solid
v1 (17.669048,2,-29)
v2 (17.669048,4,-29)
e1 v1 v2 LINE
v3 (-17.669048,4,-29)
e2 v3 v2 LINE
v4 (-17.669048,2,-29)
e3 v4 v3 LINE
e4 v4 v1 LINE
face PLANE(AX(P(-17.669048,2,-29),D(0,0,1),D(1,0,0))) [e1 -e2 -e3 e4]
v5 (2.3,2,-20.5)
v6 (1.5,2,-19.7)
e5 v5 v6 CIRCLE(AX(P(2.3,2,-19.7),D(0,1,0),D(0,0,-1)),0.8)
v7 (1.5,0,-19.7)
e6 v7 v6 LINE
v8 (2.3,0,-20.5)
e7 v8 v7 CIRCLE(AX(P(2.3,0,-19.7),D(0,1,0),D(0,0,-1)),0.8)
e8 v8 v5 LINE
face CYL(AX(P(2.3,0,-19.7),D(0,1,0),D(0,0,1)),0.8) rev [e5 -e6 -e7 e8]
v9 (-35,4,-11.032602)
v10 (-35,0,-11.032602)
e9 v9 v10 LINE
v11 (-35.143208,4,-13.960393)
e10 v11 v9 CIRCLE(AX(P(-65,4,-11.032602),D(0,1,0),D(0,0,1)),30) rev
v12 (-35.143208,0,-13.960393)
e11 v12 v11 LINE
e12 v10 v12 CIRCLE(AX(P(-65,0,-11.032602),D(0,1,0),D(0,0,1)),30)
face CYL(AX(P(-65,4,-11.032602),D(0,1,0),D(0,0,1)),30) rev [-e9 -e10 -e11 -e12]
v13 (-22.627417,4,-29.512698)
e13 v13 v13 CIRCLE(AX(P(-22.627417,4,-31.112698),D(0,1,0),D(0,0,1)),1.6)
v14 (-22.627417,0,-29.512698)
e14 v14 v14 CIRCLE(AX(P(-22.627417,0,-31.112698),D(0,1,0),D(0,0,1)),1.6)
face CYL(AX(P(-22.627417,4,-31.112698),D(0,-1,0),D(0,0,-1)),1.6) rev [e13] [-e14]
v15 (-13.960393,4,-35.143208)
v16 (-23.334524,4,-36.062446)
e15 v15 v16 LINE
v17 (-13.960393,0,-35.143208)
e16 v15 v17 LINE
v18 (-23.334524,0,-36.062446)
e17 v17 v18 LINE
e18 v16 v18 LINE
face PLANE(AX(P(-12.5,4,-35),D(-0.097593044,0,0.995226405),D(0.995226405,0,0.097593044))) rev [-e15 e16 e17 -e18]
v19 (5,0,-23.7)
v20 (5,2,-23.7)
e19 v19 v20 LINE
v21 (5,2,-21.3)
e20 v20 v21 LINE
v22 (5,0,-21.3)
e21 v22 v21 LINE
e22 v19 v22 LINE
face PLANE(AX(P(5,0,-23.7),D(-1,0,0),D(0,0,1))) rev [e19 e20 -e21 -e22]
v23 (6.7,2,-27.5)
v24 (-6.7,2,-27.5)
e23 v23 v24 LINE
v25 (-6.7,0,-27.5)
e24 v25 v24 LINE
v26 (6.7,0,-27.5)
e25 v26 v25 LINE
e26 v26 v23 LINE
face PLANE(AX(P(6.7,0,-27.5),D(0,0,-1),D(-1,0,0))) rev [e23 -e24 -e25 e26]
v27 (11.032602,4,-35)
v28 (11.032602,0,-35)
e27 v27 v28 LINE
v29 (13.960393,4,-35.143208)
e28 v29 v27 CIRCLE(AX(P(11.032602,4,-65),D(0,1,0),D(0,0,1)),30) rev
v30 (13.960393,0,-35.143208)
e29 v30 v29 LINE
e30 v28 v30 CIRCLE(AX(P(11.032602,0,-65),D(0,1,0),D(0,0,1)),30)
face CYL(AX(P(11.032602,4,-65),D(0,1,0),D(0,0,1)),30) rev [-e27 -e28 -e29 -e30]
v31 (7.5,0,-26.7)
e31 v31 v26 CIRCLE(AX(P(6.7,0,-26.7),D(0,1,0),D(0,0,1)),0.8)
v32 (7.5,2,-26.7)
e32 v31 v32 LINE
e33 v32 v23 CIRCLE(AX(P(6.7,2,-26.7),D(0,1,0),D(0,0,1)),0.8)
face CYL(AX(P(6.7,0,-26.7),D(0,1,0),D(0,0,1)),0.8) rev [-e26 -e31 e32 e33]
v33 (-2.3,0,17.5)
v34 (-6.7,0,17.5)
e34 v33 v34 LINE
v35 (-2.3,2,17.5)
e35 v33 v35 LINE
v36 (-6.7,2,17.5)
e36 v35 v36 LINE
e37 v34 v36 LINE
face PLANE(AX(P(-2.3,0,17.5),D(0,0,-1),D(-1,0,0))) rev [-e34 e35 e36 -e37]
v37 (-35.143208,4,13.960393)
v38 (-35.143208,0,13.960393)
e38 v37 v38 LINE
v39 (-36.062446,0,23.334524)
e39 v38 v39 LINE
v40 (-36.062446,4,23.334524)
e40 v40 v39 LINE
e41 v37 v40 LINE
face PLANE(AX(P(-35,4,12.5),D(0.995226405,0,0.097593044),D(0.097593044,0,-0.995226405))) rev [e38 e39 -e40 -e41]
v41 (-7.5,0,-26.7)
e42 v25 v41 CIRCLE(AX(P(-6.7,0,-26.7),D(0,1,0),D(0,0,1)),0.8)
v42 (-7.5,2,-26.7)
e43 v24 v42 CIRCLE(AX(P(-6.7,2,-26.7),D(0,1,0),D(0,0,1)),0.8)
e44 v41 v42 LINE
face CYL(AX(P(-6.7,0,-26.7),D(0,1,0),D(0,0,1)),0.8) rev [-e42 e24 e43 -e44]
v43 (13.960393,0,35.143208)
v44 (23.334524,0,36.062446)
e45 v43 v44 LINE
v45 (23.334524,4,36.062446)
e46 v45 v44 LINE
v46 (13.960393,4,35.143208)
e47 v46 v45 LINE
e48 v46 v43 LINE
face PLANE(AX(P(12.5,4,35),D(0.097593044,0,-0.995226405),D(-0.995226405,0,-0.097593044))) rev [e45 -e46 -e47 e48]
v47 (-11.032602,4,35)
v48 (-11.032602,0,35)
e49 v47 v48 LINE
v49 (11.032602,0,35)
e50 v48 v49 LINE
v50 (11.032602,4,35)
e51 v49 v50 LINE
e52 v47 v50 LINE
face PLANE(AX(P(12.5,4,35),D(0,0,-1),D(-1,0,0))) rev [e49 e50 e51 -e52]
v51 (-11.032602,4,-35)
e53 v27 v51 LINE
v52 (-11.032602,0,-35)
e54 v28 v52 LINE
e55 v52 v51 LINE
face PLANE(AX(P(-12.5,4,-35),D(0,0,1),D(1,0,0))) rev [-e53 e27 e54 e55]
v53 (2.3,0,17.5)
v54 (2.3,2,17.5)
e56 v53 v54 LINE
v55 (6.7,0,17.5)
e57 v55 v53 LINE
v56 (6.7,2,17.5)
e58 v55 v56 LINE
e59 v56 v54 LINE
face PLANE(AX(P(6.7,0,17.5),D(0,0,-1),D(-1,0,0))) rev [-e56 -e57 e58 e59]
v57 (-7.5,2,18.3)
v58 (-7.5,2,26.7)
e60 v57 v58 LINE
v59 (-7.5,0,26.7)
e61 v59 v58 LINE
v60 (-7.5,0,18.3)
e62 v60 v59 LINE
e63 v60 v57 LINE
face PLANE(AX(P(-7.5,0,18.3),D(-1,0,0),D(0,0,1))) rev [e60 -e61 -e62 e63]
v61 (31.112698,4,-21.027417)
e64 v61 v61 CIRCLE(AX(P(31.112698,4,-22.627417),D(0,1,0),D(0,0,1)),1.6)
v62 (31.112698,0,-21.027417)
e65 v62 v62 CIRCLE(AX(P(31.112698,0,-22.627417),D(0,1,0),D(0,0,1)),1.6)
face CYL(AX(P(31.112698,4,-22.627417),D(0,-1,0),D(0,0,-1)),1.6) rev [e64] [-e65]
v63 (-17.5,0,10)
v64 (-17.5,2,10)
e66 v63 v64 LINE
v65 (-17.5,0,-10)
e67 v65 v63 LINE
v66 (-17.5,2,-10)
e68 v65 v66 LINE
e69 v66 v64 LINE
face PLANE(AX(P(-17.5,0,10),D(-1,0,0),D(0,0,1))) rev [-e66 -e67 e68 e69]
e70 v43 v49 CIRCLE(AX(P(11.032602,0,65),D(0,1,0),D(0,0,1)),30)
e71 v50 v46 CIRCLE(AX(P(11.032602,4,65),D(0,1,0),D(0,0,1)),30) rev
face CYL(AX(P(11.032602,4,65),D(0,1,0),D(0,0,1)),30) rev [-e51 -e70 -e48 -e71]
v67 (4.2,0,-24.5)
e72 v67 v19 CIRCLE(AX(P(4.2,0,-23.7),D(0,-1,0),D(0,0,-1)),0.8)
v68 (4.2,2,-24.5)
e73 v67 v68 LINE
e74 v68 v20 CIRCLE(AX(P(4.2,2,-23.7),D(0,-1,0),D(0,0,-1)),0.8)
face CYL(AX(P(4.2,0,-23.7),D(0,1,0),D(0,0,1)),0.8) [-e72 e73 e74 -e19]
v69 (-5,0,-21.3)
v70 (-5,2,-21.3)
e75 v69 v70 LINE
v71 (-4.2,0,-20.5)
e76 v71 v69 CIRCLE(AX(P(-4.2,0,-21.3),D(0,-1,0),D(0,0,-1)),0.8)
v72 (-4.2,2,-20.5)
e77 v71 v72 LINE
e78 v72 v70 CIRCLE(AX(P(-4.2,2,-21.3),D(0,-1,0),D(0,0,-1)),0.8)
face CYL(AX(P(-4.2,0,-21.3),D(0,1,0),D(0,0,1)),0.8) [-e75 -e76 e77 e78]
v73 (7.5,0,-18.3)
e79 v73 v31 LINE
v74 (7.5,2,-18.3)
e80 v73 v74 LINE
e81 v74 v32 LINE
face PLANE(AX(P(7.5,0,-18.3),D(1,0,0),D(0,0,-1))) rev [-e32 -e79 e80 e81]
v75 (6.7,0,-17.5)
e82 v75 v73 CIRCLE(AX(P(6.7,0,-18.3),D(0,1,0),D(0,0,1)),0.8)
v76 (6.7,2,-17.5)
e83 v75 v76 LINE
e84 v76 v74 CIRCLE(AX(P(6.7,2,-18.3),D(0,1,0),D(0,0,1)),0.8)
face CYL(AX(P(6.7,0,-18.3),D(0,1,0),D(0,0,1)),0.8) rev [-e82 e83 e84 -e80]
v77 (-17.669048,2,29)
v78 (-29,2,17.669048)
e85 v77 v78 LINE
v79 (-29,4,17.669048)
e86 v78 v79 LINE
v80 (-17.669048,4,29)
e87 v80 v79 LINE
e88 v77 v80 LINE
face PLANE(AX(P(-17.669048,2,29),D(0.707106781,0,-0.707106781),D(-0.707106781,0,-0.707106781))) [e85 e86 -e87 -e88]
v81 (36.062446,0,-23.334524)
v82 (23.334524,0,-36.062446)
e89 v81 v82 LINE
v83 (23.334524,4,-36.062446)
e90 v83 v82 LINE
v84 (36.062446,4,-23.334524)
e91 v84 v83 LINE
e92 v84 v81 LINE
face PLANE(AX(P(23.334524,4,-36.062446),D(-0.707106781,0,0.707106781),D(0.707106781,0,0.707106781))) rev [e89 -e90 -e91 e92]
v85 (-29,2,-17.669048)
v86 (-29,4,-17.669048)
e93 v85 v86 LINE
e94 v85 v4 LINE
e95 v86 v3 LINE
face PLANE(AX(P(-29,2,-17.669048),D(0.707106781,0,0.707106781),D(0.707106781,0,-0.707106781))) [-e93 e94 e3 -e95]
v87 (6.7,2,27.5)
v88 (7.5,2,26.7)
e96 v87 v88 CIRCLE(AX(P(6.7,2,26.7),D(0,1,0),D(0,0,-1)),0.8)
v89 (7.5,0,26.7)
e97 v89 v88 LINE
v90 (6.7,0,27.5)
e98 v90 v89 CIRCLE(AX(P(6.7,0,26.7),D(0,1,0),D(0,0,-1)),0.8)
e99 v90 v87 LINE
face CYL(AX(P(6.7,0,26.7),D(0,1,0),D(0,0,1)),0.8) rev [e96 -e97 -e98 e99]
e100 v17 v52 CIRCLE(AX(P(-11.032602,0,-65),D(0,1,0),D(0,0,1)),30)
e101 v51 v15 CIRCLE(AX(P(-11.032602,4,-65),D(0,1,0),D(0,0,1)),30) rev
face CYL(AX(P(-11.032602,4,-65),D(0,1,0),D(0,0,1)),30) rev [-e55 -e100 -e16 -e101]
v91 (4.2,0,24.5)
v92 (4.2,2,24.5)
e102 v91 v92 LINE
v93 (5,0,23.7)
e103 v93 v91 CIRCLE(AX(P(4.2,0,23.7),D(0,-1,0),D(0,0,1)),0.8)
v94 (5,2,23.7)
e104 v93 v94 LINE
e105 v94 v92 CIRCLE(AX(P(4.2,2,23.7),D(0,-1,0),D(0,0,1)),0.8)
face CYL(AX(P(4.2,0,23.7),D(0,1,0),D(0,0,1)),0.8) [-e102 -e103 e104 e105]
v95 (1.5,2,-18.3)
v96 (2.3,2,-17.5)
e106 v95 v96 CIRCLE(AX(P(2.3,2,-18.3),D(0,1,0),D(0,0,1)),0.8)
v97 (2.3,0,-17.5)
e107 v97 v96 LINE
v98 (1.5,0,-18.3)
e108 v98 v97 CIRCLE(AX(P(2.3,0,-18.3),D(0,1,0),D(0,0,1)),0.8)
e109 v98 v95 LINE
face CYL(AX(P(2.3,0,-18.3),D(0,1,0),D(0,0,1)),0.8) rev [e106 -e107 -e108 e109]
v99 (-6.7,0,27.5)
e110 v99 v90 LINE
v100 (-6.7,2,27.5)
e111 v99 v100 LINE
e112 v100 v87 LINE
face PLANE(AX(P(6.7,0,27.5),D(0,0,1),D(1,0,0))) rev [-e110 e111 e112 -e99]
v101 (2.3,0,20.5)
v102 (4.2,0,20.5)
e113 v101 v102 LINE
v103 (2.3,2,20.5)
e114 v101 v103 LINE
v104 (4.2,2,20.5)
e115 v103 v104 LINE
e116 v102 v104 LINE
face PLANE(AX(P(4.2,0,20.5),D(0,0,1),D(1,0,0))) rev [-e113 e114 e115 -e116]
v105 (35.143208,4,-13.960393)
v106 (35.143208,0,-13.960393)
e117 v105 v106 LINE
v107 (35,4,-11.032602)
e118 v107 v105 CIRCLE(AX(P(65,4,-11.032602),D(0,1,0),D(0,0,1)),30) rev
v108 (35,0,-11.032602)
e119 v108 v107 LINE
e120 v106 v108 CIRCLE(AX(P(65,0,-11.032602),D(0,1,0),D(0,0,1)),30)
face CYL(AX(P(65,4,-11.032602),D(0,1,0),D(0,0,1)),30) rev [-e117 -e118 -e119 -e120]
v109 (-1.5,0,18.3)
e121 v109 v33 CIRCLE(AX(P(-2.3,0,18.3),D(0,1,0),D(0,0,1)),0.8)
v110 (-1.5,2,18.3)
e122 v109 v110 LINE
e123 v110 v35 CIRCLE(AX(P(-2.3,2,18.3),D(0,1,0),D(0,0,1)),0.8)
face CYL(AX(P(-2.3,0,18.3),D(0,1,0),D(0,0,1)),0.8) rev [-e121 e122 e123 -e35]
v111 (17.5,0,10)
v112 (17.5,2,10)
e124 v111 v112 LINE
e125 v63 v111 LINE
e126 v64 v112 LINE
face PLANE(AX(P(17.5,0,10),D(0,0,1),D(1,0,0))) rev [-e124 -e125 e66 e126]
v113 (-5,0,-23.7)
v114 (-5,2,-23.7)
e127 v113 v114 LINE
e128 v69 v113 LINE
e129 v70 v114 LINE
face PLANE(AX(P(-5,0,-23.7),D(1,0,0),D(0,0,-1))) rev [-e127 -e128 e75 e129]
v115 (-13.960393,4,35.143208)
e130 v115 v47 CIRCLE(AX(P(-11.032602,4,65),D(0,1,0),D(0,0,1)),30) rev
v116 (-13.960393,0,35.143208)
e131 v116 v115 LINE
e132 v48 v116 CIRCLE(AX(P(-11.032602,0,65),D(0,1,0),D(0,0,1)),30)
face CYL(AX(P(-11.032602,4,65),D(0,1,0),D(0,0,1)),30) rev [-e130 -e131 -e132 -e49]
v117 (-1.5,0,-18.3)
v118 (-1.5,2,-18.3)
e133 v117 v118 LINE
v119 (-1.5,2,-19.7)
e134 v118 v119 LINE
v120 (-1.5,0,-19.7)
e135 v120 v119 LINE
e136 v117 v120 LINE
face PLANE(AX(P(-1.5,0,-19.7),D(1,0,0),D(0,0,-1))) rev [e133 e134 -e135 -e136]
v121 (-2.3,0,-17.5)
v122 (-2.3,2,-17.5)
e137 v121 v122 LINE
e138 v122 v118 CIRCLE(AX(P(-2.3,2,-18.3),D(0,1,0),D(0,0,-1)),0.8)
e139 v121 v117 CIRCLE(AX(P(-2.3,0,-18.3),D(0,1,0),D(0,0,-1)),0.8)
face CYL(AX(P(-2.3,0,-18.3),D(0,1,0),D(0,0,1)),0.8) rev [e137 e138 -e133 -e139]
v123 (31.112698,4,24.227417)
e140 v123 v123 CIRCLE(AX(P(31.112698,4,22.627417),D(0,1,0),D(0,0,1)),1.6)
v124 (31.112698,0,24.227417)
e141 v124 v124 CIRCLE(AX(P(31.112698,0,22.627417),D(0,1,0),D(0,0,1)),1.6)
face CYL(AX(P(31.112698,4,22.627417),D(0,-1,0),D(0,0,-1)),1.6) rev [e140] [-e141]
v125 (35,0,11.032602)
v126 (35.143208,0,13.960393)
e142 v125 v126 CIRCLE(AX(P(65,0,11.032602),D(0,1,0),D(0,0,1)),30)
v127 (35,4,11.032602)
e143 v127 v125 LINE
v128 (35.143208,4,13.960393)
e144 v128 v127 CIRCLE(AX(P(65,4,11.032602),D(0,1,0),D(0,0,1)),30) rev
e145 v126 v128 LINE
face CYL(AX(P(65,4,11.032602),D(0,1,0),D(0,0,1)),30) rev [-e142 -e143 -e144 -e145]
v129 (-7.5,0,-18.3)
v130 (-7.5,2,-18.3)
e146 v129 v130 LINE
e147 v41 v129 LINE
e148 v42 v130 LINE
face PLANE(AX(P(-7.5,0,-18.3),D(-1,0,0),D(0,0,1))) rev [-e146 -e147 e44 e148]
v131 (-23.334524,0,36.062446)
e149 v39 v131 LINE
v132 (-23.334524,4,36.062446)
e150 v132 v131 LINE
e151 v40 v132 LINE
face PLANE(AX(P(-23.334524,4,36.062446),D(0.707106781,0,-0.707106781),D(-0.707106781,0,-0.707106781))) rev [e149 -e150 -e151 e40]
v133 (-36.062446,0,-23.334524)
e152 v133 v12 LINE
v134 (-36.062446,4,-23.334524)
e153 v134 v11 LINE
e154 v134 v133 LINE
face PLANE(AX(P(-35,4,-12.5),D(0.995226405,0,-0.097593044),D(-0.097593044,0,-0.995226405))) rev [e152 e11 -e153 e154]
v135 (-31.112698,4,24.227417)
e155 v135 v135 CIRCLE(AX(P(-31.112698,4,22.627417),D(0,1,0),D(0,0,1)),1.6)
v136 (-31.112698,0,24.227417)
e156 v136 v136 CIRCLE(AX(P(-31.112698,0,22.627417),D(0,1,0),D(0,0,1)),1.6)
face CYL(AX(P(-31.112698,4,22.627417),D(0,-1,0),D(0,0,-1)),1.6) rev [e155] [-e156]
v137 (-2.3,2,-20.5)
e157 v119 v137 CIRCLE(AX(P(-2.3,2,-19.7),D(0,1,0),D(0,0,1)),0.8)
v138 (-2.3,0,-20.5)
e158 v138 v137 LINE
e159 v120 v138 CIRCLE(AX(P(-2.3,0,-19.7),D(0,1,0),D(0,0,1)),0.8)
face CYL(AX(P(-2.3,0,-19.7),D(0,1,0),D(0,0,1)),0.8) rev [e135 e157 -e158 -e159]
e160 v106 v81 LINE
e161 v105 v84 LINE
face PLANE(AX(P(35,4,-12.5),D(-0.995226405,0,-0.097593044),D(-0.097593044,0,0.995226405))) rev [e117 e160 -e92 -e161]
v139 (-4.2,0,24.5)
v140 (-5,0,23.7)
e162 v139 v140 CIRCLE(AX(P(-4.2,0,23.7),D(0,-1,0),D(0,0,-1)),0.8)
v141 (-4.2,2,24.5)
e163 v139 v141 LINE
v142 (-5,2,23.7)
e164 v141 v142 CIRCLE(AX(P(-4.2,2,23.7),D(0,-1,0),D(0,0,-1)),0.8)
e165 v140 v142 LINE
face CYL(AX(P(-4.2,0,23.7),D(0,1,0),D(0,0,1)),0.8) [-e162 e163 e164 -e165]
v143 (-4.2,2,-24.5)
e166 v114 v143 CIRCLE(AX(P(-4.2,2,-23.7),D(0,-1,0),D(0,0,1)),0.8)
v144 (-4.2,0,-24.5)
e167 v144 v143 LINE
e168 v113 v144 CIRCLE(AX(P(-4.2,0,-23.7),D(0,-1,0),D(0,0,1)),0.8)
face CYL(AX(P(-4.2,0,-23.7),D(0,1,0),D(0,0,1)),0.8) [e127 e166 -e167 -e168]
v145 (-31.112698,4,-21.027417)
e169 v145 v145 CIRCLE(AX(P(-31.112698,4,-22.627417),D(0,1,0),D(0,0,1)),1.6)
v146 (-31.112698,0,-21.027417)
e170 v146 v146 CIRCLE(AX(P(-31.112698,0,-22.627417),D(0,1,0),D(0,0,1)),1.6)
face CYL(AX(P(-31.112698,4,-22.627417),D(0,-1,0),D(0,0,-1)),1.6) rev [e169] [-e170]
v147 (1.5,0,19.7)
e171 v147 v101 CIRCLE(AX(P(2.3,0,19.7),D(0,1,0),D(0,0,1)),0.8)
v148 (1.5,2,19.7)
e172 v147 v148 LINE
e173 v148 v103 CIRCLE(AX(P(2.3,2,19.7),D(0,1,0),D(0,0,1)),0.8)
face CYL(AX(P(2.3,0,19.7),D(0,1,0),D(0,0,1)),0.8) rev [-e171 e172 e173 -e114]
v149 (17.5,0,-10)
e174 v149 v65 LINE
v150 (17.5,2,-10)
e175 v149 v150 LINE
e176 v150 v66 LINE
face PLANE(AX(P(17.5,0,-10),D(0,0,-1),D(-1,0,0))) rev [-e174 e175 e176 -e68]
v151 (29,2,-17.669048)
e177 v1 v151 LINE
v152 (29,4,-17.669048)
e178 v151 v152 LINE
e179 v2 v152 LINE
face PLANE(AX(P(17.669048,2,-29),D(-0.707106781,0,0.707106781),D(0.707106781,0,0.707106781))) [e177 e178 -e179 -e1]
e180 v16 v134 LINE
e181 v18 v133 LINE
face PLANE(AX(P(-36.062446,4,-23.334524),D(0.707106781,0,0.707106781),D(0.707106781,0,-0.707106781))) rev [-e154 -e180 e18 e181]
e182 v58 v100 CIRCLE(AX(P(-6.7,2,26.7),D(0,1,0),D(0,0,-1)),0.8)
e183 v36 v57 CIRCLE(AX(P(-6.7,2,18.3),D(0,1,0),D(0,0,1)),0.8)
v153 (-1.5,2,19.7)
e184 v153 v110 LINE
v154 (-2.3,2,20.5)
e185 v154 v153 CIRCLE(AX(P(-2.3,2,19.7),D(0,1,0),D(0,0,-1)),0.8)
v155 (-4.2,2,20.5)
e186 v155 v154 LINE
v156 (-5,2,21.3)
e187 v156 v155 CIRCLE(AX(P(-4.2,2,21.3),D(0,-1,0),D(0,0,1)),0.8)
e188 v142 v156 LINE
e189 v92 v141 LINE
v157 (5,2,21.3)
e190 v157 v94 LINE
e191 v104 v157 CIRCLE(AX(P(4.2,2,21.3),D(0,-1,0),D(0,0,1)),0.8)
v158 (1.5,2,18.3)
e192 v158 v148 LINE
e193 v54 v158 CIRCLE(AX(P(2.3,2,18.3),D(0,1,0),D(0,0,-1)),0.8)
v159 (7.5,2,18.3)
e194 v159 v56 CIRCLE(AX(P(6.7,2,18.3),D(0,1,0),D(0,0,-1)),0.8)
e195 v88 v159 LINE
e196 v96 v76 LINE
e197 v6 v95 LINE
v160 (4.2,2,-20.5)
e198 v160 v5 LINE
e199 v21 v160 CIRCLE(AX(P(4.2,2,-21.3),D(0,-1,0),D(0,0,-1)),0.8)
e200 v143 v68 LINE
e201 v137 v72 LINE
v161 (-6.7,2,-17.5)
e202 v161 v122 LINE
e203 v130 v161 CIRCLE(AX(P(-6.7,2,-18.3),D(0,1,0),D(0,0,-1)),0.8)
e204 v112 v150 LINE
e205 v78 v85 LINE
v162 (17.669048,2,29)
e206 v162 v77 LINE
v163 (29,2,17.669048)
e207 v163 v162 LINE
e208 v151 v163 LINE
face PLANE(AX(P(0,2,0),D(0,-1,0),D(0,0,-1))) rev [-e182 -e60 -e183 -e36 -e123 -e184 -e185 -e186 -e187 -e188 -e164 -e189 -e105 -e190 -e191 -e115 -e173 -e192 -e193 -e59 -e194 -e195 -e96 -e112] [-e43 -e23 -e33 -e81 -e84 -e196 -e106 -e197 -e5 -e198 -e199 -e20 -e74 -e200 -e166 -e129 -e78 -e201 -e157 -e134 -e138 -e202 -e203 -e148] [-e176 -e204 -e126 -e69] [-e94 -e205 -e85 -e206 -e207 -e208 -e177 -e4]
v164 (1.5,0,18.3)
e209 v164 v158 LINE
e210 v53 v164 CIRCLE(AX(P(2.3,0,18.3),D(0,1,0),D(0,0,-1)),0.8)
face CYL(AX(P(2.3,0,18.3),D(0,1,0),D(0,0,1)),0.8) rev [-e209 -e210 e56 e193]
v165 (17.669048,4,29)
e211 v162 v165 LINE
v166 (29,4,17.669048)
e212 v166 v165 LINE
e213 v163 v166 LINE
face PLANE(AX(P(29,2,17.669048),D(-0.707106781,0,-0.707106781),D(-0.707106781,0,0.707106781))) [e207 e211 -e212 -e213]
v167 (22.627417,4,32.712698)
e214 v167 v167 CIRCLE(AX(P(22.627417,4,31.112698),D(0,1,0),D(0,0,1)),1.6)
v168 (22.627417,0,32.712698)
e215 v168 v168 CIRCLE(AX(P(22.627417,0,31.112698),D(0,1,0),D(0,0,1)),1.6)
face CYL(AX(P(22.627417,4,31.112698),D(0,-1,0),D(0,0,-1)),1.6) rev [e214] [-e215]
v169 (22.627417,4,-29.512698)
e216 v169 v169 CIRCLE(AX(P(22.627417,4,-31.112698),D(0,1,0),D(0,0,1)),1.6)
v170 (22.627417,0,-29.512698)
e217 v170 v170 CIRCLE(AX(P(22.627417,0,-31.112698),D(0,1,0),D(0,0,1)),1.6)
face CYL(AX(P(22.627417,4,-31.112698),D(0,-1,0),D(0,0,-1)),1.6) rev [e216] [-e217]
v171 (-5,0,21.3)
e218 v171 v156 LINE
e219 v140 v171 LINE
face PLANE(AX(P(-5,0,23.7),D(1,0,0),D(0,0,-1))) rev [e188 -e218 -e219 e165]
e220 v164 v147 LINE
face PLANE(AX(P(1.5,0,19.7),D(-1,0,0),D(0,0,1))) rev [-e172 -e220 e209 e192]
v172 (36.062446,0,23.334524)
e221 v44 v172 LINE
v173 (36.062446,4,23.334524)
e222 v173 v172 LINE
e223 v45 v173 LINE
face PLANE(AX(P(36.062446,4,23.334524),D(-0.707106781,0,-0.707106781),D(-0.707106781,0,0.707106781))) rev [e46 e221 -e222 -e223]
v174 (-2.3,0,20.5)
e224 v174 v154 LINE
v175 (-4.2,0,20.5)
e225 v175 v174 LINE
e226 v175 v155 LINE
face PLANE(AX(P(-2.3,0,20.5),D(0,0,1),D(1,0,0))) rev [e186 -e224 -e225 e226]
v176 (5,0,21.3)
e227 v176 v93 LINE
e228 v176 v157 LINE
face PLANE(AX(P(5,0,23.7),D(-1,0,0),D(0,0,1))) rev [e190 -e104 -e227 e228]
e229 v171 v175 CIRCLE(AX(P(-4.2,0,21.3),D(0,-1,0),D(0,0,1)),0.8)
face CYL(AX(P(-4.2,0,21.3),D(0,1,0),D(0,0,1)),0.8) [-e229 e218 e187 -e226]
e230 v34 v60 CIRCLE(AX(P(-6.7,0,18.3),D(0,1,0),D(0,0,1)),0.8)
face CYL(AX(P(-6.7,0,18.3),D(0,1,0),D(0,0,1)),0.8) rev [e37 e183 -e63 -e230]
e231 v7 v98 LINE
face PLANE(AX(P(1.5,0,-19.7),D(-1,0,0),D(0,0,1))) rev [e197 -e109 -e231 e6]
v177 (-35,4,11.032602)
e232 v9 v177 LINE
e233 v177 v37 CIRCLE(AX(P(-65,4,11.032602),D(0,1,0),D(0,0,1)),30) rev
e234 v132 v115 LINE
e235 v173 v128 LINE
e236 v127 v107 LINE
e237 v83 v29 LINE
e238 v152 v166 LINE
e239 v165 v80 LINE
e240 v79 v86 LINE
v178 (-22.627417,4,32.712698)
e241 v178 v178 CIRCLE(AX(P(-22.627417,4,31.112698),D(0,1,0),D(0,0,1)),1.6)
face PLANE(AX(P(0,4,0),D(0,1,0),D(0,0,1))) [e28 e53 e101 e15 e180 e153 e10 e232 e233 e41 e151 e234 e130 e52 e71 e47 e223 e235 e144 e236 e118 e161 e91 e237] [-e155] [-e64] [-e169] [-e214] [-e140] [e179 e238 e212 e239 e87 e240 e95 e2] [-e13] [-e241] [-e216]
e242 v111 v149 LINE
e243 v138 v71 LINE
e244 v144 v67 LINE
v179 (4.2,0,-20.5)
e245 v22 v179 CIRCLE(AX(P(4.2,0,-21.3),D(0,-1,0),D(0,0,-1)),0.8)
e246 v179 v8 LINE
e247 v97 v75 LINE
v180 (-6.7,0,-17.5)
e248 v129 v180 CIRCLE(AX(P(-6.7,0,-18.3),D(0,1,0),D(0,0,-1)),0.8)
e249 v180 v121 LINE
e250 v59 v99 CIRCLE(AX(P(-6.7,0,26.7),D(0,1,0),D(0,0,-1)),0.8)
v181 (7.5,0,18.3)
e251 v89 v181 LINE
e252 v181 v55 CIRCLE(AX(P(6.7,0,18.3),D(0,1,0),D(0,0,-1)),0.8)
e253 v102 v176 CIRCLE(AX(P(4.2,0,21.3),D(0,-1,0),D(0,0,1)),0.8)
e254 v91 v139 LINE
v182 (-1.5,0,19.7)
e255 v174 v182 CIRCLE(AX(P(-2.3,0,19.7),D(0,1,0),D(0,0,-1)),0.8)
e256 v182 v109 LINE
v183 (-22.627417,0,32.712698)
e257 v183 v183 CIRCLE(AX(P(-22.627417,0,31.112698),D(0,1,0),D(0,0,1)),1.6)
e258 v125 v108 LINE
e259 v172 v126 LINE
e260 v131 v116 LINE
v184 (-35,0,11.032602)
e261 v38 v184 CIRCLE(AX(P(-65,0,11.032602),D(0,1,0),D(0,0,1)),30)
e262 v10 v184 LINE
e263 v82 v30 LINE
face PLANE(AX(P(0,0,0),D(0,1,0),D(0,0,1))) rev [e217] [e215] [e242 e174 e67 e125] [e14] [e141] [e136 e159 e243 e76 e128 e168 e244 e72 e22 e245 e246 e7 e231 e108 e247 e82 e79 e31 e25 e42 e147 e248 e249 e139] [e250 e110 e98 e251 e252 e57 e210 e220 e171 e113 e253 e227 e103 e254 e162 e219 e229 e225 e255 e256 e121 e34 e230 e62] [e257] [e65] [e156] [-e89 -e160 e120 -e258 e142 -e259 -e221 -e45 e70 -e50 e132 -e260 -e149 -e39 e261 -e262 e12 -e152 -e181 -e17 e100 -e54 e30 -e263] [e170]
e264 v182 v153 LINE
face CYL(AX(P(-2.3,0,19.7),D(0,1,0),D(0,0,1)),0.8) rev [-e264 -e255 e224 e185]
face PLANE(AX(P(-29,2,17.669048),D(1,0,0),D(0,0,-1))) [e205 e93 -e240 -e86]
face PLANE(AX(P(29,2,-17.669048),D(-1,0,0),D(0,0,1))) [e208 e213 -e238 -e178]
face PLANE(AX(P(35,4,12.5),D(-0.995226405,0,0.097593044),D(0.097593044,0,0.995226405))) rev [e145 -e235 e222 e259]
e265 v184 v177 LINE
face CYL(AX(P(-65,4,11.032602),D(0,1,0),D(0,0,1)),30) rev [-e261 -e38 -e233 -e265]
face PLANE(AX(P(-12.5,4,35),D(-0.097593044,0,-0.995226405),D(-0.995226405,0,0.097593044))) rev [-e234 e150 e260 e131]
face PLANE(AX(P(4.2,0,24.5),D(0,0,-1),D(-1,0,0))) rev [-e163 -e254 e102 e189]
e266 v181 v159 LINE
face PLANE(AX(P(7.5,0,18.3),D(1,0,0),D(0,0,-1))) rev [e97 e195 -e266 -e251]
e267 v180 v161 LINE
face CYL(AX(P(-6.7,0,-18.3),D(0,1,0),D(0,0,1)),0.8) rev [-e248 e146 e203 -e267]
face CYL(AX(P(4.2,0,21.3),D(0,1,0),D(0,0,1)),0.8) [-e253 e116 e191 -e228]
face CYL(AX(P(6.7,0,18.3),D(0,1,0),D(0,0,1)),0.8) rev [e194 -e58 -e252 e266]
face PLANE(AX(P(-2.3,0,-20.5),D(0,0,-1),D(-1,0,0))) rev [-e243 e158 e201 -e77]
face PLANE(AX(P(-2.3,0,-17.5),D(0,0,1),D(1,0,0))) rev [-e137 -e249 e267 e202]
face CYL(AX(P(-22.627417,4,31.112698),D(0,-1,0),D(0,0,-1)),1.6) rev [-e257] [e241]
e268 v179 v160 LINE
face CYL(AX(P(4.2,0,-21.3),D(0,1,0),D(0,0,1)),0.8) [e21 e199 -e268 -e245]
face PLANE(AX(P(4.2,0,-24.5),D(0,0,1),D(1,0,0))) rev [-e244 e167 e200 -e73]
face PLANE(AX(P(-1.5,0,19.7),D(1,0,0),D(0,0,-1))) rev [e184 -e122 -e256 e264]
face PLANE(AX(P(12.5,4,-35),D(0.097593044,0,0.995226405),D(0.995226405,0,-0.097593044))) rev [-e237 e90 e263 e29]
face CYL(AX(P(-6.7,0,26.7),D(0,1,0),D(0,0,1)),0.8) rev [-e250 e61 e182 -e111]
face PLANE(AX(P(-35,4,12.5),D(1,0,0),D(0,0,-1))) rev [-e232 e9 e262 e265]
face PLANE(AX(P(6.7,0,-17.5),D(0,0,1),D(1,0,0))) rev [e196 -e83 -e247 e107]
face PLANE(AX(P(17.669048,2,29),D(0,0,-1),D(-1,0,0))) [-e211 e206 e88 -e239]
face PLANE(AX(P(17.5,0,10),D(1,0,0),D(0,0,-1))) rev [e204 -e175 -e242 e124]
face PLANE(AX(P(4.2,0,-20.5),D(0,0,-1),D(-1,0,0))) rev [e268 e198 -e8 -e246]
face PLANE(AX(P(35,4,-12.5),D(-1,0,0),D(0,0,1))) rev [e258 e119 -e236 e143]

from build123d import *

# Parameters (mm, degrees)
SKETCH1_R           = 1.6
BOSS_EXTRUDE1_DEPTH = 4
CUT_EXTRUDE1_DEPTH  = 2
FILLET2_R           = 30
CUT_EXTRUDE5_DEPTH  = 52.039200621
SKETCH7_W           = 35
SKETCH7_H           = 20
CUT_EXTRUDE6_DEPTH  = 52.039200621


with BuildPart() as part:
    # Sketch1 → Boss-Extrude1 (new body)
    with BuildSketch(Plane(origin=(0, 0, 0), x_dir=(1, 0, 0), z_dir=(0, 1, 0))):
        Polygon((-12.5, 35), (12.5, 35), (23.334523779, 36.062445841), (36.062445841, 23.334523779), (35, 12.5), (35, -12.5), (36.062445841, -23.334523779), (23.334523779, -36.062445841), (12.5, -35), (-12.5, -35), (-23.334523779, -36.062445841), (-36.06244584, -23.334523779), (-35, -12.5), (-35, 12.5), (-36.062445841, 23.334523779), (-23.334523779, 36.062445841), align=None)
        with Locations(Location((22.627416998, 31.112698372, 0), (0, 0, 270))):
            Circle(SKETCH1_R, mode=Mode.SUBTRACT)
        with Locations(Location((31.112698372, 22.627416998, 0), (0, 0, 270))):
            Circle(SKETCH1_R, mode=Mode.SUBTRACT)
        with Locations(Location((22.627416998, -31.112698372, 0), (0, 0, 270))):
            Circle(SKETCH1_R, mode=Mode.SUBTRACT)
        with Locations(Location((31.112698372, -22.627416998, 0), (0, 0, 270))):
            Circle(SKETCH1_R, mode=Mode.SUBTRACT)
        with Locations(Location((-31.112698372, -22.627416998, 0), (0, 0, 270))):
            Circle(SKETCH1_R, mode=Mode.SUBTRACT)
        with Locations(Location((-22.627416998, -31.112698372, 0), (0, 0, 270))):
            Circle(SKETCH1_R, mode=Mode.SUBTRACT)
        with Locations(Location((-22.627416998, 31.112698372, 0), (0, 0, 270))):
            Circle(SKETCH1_R, mode=Mode.SUBTRACT)
        with Locations(Location((-31.112698372, 22.627416998, 0), (0, 0, 270))):
            Circle(SKETCH1_R, mode=Mode.SUBTRACT)
    extrude(amount=BOSS_EXTRUDE1_DEPTH)

    # Sketch2 → Cut-Extrude1 (cut)
    with BuildSketch(Plane(origin=(0, 4, 0), x_dir=(1, 0, 0), z_dir=(0, 1, 0))):
        Polygon((-17.669047558, 29), (17.669047558, 29), (29, 17.669047558), (29, -17.669047558), (17.669047558, -29), (-17.669047558, -29), (-29, -17.669047558), (-29, 17.669047558), align=None)
    extrude(amount=-CUT_EXTRUDE1_DEPTH, mode=Mode.SUBTRACT)

    # Fillet2
    # the kernel refuses this fillet: 30 mm, written as the material it adds along each edge
    with BuildSketch(Plane(origin=(-12.5, 0, -35), x_dir=(1, 0, 0), z_dir=(0, 1, 0))) as fillet2_piece_1:
        with BuildLine():
            CenterArc((FILLET2_R * 0.0489132680017, FILLET2_R), FILLET2_R, 264.399415997, 5.600584003)
            Line((-FILLET2_R * 0.0486797758843, FILLET2_R * 0.00477359471069), (0, 0))
            Line((0, 0), (FILLET2_R * 0.0489132680017, 0))
        make_face()
    extrude(amount=4)
    with BuildSketch(Plane(origin=(12.5, 0, -35), x_dir=(-1, 0, 0), z_dir=(0, 1, 0)), Plane(origin=(35, 0, -12.5), x_dir=(0.09759304388595028, 0, -0.9952264052893065), z_dir=(0, 1, 0)), Plane(origin=(35, 0, 12.5), x_dir=(0, 0, -1), z_dir=(0, 1, 0)), Plane(origin=(12.5, 0, 35), x_dir=(0.9952264052893073, 0, 0.09759304388594116), z_dir=(0, 1, 0)), Plane(origin=(-12.5, 0, 35), x_dir=(1, 0, 0), z_dir=(0, 1, 0)), Plane(origin=(-35, 0, 12.5), x_dir=(-0.09759304388594536, 0, 0.995226405289307), z_dir=(0, 1, 0)), Plane(origin=(-35, 0, -12.5), x_dir=(0, 0, 1), z_dir=(0, 1, 0))) as fillet2_piece_2:
        with BuildLine():
            CenterArc((FILLET2_R * 0.048913268002, -FILLET2_R), FILLET2_R, 90, 5.600584003)
            Line((-FILLET2_R * 0.0486797758846, -FILLET2_R * 0.00477359471075), (0, 0))
            Line((0, 0), (FILLET2_R * 0.048913268002, 0))
        make_face()
    extrude(amount=4)

    # Sketch6 → Cut-Extrude5 (cut, through all)
    with BuildSketch(Plane(origin=(0, 2, 0), x_dir=(1, 0, 0), z_dir=(0, 1, 0))):
        with BuildLine():
            Line((-1.5, 19.7), (-1.5, 18.3))
            ThreePointArc((-1.5, 18.3), (-1.734314575, 17.734314575), (-2.3, 17.5))
            Line((-2.3, 17.5), (-6.7, 17.5))
            ThreePointArc((-6.7, 17.5), (-7.265685425, 17.734314575), (-7.5, 18.3))
            Line((-7.5, 18.3), (-7.5, 26.7))
            ThreePointArc((-7.5, 26.7), (-7.265685425, 27.265685425), (-6.7, 27.5))
            Line((-6.7, 27.5), (6.7, 27.5))
            ThreePointArc((6.7, 27.5), (7.265685425, 27.265685425), (7.5, 26.7))
            Line((7.5, 26.7), (7.5, 18.3))
            ThreePointArc((7.5, 18.3), (7.265685425, 17.734314575), (6.7, 17.5))
            Line((6.7, 17.5), (2.3, 17.5))
            ThreePointArc((2.3, 17.5), (1.734314575, 17.734314575), (1.5, 18.3))
            Line((1.5, 18.3), (1.5, 19.7))
            ThreePointArc((1.5, 19.7), (1.734314575, 20.265685425), (2.3, 20.5))
            Line((2.3, 20.5), (4.2, 20.5))
            ThreePointArc((4.2, 20.5), (4.765685425, 20.734314575), (5, 21.3))
            Line((5, 21.3), (5, 23.7))
            ThreePointArc((5, 23.7), (4.765685425, 24.265685425), (4.2, 24.5))
            Line((4.2, 24.5), (-4.2, 24.5))
            ThreePointArc((-4.2, 24.5), (-4.765685425, 24.265685425), (-5, 23.7))
            Line((-5, 23.7), (-5, 21.3))
            ThreePointArc((-5, 21.3), (-4.765685425, 20.734314575), (-4.2, 20.5))
            Line((-4.2, 20.5), (-2.3, 20.5))
            ThreePointArc((-2.3, 20.5), (-1.734314575, 20.265685425), (-1.5, 19.7))
        make_face()
        with BuildLine():
            Line((-2.3, -17.5), (-6.7, -17.5))
            ThreePointArc((-6.7, -17.5), (-7.265685425, -17.734314575), (-7.5, -18.3))
            Line((-7.5, -18.3), (-7.5, -26.7))
            ThreePointArc((-7.5, -26.7), (-7.265685425, -27.265685425), (-6.7, -27.5))
            Line((-6.7, -27.5), (6.7, -27.5))
            ThreePointArc((6.7, -27.5), (7.265685425, -27.265685425), (7.5, -26.7))
            Line((7.5, -26.7), (7.5, -18.3))
            ThreePointArc((7.5, -18.3), (7.265685425, -17.734314575), (6.7, -17.5))
            Line((6.7, -17.5), (2.3, -17.5))
            ThreePointArc((2.3, -17.5), (1.734314575, -17.734314575), (1.5, -18.3))
            Line((1.5, -18.3), (1.5, -19.7))
            ThreePointArc((1.5, -19.7), (1.734314575, -20.265685425), (2.3, -20.5))
            Line((2.3, -20.5), (4.2, -20.5))
            ThreePointArc((4.2, -20.5), (4.765685425, -20.734314575), (5, -21.3))
            Line((5, -21.3), (5, -23.7))
            ThreePointArc((5, -23.7), (4.765685425, -24.265685425), (4.2, -24.5))
            Line((4.2, -24.5), (-4.2, -24.5))
            ThreePointArc((-4.2, -24.5), (-4.765685425, -24.265685425), (-5, -23.7))
            Line((-5, -23.7), (-5, -21.3))
            ThreePointArc((-5, -21.3), (-4.765685425, -20.734314575), (-4.2, -20.5))
            Line((-4.2, -20.5), (-2.3, -20.5))
            ThreePointArc((-2.3, -20.5), (-1.734314575, -20.265685425), (-1.5, -19.7))
            Line((-1.5, -19.7), (-1.5, -18.3))
            ThreePointArc((-1.5, -18.3), (-1.734314575, -17.734314575), (-2.3, -17.5))
        make_face()
    extrude(amount=-CUT_EXTRUDE5_DEPTH, mode=Mode.SUBTRACT)

    # Sketch7 → Cut-Extrude6 (cut, through all)
    with BuildSketch(Plane(origin=(0, 2, 0), x_dir=(1, 0, 0), z_dir=(0, 1, 0))):
        Rectangle(SKETCH7_W, SKETCH7_H)
    extrude(amount=-CUT_EXTRUDE6_DEPTH, mode=Mode.SUBTRACT)


solid = part.part
